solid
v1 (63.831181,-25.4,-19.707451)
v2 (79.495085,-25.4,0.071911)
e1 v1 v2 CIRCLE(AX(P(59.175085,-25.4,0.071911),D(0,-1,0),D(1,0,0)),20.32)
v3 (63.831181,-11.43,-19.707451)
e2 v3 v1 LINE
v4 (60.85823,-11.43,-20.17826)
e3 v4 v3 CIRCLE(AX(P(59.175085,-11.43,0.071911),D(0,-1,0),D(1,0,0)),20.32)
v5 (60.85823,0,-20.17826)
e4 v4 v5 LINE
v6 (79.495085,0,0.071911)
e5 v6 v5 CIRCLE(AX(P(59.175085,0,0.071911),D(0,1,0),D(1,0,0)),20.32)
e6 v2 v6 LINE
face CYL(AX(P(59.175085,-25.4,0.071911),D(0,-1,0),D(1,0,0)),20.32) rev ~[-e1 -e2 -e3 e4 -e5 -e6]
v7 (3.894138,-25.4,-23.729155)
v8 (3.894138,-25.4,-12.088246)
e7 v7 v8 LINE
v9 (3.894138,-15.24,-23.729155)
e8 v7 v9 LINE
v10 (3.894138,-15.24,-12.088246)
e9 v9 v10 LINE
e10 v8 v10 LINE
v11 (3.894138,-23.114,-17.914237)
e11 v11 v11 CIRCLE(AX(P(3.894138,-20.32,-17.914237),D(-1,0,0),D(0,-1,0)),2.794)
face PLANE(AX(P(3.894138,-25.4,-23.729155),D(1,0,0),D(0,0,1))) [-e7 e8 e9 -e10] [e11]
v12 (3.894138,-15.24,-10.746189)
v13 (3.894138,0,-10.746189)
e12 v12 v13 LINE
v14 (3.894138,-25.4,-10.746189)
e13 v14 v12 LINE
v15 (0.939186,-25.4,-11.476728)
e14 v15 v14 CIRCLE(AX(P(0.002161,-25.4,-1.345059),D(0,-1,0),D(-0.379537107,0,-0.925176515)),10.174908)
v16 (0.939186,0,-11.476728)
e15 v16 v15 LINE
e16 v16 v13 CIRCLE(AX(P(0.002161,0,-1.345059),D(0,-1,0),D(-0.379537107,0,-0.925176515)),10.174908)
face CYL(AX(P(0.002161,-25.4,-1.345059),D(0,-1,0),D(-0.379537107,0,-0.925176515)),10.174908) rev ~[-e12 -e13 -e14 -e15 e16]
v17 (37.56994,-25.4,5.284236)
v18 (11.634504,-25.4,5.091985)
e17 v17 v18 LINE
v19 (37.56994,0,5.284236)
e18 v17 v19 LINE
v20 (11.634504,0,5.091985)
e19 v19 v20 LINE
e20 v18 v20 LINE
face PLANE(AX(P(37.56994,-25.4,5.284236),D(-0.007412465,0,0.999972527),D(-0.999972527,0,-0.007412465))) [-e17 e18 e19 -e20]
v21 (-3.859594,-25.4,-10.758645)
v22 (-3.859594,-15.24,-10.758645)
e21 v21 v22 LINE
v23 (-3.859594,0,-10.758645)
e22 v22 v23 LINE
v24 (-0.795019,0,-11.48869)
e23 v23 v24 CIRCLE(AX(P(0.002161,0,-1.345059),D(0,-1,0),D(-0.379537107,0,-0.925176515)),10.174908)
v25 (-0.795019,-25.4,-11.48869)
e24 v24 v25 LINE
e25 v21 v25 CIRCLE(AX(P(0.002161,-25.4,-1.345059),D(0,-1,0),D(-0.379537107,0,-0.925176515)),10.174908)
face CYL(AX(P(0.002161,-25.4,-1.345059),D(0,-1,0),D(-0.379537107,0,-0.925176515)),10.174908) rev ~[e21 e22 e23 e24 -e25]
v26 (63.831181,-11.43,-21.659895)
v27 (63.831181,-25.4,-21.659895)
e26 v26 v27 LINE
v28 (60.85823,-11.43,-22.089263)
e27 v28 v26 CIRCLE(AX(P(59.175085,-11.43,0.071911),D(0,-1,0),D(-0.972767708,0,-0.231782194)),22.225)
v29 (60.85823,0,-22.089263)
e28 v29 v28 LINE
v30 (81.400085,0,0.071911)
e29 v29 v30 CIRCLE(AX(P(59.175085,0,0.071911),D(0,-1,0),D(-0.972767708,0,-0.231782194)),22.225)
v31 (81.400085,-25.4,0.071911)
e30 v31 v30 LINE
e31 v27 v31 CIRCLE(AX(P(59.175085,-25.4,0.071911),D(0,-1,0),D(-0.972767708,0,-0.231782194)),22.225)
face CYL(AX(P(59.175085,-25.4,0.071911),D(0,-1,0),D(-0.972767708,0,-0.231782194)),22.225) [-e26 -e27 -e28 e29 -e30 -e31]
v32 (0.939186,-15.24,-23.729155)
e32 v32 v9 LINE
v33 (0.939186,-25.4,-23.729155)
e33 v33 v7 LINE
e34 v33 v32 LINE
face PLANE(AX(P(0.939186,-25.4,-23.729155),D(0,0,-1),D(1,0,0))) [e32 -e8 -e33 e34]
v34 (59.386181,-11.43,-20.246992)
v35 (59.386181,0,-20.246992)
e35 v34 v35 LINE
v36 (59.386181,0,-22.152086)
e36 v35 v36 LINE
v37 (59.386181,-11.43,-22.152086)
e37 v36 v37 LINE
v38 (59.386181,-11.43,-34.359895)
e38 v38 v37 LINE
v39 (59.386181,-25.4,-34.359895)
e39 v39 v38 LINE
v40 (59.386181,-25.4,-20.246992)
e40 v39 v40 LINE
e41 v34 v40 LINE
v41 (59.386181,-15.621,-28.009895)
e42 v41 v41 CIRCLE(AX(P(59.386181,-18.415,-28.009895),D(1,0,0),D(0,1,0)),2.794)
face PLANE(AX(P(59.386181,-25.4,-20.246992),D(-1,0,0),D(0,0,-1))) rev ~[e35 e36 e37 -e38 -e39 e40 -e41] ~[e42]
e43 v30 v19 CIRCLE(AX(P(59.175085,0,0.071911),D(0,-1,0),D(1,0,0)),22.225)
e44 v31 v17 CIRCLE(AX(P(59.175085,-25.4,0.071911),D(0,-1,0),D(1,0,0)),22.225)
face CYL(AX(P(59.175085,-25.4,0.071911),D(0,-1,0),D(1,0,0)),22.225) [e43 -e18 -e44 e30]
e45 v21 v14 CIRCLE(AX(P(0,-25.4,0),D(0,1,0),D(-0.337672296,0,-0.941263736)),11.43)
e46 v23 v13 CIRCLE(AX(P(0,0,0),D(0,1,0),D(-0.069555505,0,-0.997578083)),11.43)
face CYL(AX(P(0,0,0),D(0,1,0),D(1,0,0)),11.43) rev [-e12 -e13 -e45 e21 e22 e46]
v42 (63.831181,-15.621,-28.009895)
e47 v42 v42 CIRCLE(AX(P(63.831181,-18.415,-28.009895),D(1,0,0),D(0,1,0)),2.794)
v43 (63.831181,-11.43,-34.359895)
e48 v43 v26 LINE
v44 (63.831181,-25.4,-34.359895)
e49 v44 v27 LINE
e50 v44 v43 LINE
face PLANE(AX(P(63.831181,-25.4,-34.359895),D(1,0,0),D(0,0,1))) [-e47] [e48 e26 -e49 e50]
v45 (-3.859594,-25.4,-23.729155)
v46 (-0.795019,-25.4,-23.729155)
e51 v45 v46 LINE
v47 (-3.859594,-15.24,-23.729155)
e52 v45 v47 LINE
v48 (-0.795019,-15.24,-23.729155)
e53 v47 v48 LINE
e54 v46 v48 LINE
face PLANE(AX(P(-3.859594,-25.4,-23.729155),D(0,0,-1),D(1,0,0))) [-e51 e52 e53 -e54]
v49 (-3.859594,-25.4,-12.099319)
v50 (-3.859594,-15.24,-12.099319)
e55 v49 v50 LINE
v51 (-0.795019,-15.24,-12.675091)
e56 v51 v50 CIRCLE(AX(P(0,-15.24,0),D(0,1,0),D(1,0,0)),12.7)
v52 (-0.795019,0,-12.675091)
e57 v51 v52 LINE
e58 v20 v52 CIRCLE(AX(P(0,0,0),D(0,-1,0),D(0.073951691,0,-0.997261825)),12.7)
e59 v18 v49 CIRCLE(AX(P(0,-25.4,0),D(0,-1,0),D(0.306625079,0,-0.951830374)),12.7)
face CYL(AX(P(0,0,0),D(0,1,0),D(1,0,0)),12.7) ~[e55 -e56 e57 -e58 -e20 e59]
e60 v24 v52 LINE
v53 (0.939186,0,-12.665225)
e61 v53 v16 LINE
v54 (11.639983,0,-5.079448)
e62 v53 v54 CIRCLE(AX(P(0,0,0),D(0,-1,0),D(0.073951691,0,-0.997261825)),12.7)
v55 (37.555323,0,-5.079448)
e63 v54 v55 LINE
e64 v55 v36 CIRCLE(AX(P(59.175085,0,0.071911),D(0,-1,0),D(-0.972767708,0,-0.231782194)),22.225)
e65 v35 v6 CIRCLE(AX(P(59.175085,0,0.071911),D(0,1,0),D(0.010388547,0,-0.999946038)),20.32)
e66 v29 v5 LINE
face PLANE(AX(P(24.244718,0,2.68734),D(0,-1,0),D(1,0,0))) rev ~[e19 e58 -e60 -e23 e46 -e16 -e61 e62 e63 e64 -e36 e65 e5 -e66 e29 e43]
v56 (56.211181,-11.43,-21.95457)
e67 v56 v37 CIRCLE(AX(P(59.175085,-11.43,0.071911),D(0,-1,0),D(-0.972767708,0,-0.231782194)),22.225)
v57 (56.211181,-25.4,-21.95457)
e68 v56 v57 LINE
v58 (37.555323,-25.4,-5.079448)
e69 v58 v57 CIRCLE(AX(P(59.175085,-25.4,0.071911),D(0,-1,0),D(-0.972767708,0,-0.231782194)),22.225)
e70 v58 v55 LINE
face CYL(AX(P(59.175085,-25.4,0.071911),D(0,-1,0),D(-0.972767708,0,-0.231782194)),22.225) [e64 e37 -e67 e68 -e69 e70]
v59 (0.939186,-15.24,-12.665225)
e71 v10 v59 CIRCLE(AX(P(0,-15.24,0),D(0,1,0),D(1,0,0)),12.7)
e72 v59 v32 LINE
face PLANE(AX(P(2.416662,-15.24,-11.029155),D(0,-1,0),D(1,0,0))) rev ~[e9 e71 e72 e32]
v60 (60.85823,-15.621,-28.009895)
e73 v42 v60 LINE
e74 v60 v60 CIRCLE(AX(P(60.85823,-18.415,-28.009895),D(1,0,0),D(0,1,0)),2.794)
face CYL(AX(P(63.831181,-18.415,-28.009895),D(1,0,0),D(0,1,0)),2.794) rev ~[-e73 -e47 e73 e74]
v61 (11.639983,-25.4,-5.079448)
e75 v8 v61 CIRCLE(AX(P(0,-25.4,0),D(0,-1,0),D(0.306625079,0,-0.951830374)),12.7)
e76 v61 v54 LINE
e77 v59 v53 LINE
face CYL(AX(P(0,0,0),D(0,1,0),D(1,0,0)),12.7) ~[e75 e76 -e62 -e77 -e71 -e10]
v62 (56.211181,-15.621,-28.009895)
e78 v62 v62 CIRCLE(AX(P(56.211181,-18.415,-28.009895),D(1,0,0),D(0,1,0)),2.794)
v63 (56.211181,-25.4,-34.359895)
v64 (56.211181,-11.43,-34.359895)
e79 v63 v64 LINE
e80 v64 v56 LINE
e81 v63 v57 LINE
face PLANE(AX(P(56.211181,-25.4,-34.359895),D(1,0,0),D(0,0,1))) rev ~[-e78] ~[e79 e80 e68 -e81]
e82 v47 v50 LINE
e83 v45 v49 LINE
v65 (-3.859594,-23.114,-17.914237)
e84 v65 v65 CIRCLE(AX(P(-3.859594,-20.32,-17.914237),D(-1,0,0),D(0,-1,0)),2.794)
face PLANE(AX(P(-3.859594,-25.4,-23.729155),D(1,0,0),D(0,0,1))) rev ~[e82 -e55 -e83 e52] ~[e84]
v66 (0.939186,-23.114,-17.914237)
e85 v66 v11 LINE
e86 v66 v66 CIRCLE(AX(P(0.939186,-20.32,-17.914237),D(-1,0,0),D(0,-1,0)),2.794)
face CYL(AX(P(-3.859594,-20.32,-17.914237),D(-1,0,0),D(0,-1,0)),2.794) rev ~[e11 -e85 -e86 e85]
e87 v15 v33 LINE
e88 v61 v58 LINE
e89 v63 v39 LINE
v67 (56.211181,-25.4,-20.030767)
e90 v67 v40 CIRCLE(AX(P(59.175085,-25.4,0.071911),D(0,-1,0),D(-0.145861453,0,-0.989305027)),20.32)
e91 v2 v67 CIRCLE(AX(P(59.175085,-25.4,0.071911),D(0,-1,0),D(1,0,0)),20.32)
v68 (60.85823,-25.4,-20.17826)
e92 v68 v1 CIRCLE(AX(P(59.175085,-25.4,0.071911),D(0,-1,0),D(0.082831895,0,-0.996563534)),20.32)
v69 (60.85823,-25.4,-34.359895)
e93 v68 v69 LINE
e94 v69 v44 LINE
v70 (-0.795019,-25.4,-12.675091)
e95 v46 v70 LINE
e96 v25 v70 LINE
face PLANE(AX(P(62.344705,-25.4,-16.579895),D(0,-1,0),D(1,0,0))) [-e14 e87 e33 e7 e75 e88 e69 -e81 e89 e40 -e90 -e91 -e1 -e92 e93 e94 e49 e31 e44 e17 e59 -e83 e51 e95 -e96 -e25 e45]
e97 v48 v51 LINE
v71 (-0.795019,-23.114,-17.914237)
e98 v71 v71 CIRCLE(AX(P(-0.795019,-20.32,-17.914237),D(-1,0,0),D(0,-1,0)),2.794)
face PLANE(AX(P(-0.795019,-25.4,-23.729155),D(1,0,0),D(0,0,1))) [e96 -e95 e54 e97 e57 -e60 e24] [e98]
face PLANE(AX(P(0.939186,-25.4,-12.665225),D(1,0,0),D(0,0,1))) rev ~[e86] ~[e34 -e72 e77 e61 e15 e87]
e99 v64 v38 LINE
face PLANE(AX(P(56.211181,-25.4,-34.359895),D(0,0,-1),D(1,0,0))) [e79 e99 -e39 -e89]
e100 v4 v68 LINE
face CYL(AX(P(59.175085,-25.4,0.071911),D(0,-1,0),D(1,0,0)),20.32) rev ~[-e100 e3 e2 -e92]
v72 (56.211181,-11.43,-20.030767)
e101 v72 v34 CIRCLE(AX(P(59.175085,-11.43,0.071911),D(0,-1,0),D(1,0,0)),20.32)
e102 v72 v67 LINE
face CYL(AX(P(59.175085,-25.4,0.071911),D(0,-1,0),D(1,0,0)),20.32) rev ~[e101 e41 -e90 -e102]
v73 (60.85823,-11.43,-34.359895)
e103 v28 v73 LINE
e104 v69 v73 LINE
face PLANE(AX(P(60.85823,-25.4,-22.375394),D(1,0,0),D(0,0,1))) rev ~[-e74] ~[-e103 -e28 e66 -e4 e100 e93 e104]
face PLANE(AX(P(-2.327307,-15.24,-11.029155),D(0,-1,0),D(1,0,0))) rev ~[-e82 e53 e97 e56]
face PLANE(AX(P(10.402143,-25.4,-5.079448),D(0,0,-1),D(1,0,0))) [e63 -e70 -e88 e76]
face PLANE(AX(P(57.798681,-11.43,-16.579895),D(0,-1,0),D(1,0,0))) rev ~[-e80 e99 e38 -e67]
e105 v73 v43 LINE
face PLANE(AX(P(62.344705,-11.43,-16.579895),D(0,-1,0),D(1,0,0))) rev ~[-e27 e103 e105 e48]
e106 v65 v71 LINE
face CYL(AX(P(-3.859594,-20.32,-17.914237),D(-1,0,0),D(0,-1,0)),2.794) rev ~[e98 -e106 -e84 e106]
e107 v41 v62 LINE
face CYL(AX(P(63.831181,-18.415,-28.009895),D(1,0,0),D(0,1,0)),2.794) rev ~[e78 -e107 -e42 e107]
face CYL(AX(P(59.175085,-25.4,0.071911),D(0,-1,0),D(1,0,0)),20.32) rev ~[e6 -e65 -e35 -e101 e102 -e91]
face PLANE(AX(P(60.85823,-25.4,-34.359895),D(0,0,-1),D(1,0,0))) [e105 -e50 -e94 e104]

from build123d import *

# Parameters (mm, degrees)
F0_R      = 12.7
F0_R_2    = 11.43
F1_DEPTH  = 25.4
F3_R      = 20.32
F4_DEPTH  = 25.4
F5_W      = 3.0645749275
F5_H      = 25.4
F6_DEPTH  = 10.16
F8_DEPTH  = 30.226
F9_DEPTH  = 25.4
F10_R     = 2.794
F11_DEPTH = 25.4
F13_W     = 3.175
F13_H     = 35.56
F14_DEPTH = 13.97
F15_R     = 2.794
F16_DEPTH = 25.4
F18_DEPTH = 30.734
F20_DEPTH = 40.64
F22_DEPTH = 25.4


with BuildPart() as f1:
    # F0 (on Front) → F1 (new body)
    with BuildSketch(Plane.XZ):
        Circle(F0_R)
        Circle(F0_R_2, mode=Mode.SUBTRACT)
    extrude(amount=F1_DEPTH)

    # F5 (on offset) → F6 (join)
    with BuildSketch(Plane.XZ.offset(25.4)):
        with Locations((-2.327306883, -11.0291545425)):
            Rectangle(F5_W, F5_H)
        Polygon((3.894138498, 1.6708454575), (0.9391864802, 1.6708454575), (0.9391864802, -23.7291545425), (3.894138498, -23.7291545425), (3.894138498, -11.0291545425), align=None)
    extrude(amount=-F6_DEPTH)

    # F7 (on face) → F8 (cut)
    with BuildSketch(Plane.XZ.offset(25.4)):
        Polygon((-3.8595943467, 6.5400209701), (-3.8595943467, -10.7586445001), (-0.7950194192, -10.7537217399), (0.9391864802, -10.7509360094), (3.894138498, -10.7461893413), (3.894138498, 6.8227690223), align=None)
        Polygon((0.9391864802, -10.7509360094), (-0.7950194192, -10.7537217399), (-0.7950194192, -12.6750914838), (0.9391864802, -12.6652251759), (0.9391864802, -11.3913488558), align=None)
    extrude(amount=-F8_DEPTH, mode=Mode.SUBTRACT)

    # F7 (on face) → F9 (cut)
    with BuildSketch(Plane.XZ.offset(25.4)):
        Polygon((-3.8595943467, 6.5400209701), (-3.8595943467, -10.7586445001), (-0.7950194192, -10.7537217399), (0.9391864802, -10.7509360094), (3.894138498, -10.7461893413), (3.894138498, 6.8227690223), align=None)
        Polygon((0.9391864802, -10.7509360094), (-0.7950194192, -10.7537217399), (-0.7950194192, -12.6750914838), (0.9391864802, -12.6652251759), (0.9391864802, -11.3913488558), align=None)
    extrude(amount=-F9_DEPTH, mode=Mode.SUBTRACT)

    # F10 (on face) → F11 (cut)
    with BuildSketch(Plane(origin=(-3.8595943467, 0, 0), x_dir=(0, -1, 0), z_dir=(-1, 0, 0))):
        with Locations((20.32, -17.914237003)):
            Circle(F10_R)
    extrude(amount=-F11_DEPTH, mode=Mode.SUBTRACT)


with BuildPart() as f4:
    # F3 (on offset) → F4 (new body)
    with BuildSketch(Plane.XZ.offset(25.4)):
        with BuildLine():
            Line((37.5699403561, 5.2842361421), (10.6034887032, 5.0843427817))
            ThreePointArc((10.6034887032, 5.0843427817), (11.5328465432, 2.6263680661), (11.8205691299, 0.0143647333))
            Line((11.8205691299, 0.0143647333), (36.950101903, 0.0449029444))
            ThreePointArc((36.950101903, 0.0449029444), (37.1040026209, 2.6830272873), (37.5699403561, 5.2842361421))
        make_face()
        with BuildLine():
            ThreePointArc((81.4000854922, 0.0719114545), (61.799611578, 22.1414036966), (37.5699403561, 5.2842361421))
            Line((37.5699403561, 5.2842361421), (38.7200076161, 5.2927612092))
            ThreePointArc((38.7200076161, 5.2927612092), (37.3247254516, 0.1119146147), (38.6803581082, -5.079447813))
            Line((38.6803581082, -5.079447813), (37.5553231739, -5.079447813))
            ThreePointArc((37.5553231739, -5.079447813), (61.7684816706, -22.0012605256), (81.4000854922, 0.0719114545))
        make_face()
        with Locations((59.1750854922, 0.0719114545)):
            Circle(F3_R, mode=Mode.SUBTRACT)
        with BuildLine():
            Line((38.7200076161, 5.2927612092), (37.5699403561, 5.2842361421))
            ThreePointArc((37.5699403561, 5.2842361421), (37.1040026209, 2.6830272873), (36.950101903, 0.0449029444))
            ThreePointArc((36.950101903, 0.0449029444), (37.1034933748, -2.5348962497), (37.5553231739, -5.079447813))
            Line((37.5553231739, -5.079447813), (38.6803581082, -5.079447813))
            ThreePointArc((38.6803581082, -5.079447813), (37.3247254516, 0.1119146147), (38.7200076161, 5.2927612092))
        make_face()
        with BuildLine():
            Line((36.950101903, 0.0449029444), (11.8205691299, 0.0143647333))
            ThreePointArc((11.8205691299, 0.0143647333), (11.4383828548, -2.6236056978), (10.4021426077, -5.079447813))
            Line((10.4021426077, -5.079447813), (37.5553231739, -5.079447813))
            ThreePointArc((37.5553231739, -5.079447813), (37.1034933748, -2.5348962497), (36.950101903, 0.0449029444))
        make_face()
    extrude(amount=-F4_DEPTH)


with BuildPart() as f1_1:
    add(f1.part)

    # F12: union F4
    add(f4.part)

    # F13 (on face) → F14 (join)
    with BuildSketch(Plane.XZ.offset(25.4)):
        Polygon((63.8311807601, 1.2001052282), (60.8582296082, 1.2001052282), (60.8582296082, -34.3598947718), (63.8311807601, -34.3598947718), (63.8311807601, -21.6598947718), align=None)
        with Locations((57.7986807601, -16.5798947718)):
            Rectangle(F13_W, F13_H)
    extrude(amount=-F14_DEPTH)

    # F15 (on face) → F16 (cut)
    with BuildSketch(Plane.YZ.offset(63.8311807601)):
        with Locations((-18.415, -28.0098947718)):
            Circle(F15_R)
    extrude(amount=-F16_DEPTH, mode=Mode.SUBTRACT)

    # F17 (on face) → F18 (cut)
    with BuildSketch(Plane.XZ.offset(25.4)):
        with BuildLine():
            ThreePointArc((63.8311807601, -19.7074509431), (58.3136851955, 20.3736451127), (56.2111807601, -20.0307666939))
            Line((56.2111807601, -20.0307666939), (56.2111807601, 1.2001052282))
            Line((56.2111807601, 1.2001052282), (59.3861807601, 1.2001052282))
            Line((59.3861807601, 1.2001052282), (60.8582296082, 1.2001052282))
            Line((60.8582296082, 1.2001052282), (63.8311807601, 1.2001052282))
            Line((63.8311807601, 1.2001052282), (63.8311807601, -19.7074509431))
        make_face()
        with BuildLine():
            Line((56.2111807601, 1.2001052282), (56.2111807601, -20.0307666939))
            ThreePointArc((56.2111807601, -20.0307666939), (57.7944413181, -20.2011302922), (59.3861807601, -20.2469920294))
            Line((59.3861807601, -20.2469920294), (59.3861807601, 1.2001052282))
            Line((59.3861807601, 1.2001052282), (56.2111807601, 1.2001052282))
        make_face()
        with BuildLine():
            ThreePointArc((60.8582296082, -20.1782595543), (62.3534347774, -19.9979788248), (63.8311807601, -19.7074509431))
            Line((63.8311807601, -19.7074509431), (63.8311807601, 1.2001052282))
            Line((63.8311807601, 1.2001052282), (60.8582296082, 1.2001052282))
            Line((60.8582296082, 1.2001052282), (60.8582296082, -20.1782595543))
        make_face()
        with BuildLine():
            ThreePointArc((60.8582296082, -20.1782595543), (60.1228284685, -20.2259747224), (59.3861807601, -20.2469920294))
            Line((59.3861807601, -20.2469920294), (59.3861807601, -22.1520860209))
            Line((59.3861807601, -22.1520860209), (60.8582296082, -22.0892629477))
            Line((60.8582296082, -22.0892629477), (60.8582296082, -20.1782595543))
        make_face()
        with BuildLine():
            Line((59.3861807601, 1.2001052282), (59.3861807601, -20.2469920294))
            ThreePointArc((59.3861807601, -20.2469920294), (60.1228284685, -20.2259747224), (60.8582296082, -20.1782595543))
            Line((60.8582296082, -20.1782595543), (60.8582296082, 1.2001052282))
            Line((60.8582296082, 1.2001052282), (59.3861807601, 1.2001052282))
        make_face()
        Polygon((60.8582296082, -22.0892629477), (59.3861807601, -22.1520860209), (59.3861807601, -22.3753936589), (60.8582296082, -22.3753936589), align=None)
    extrude(amount=-F18_DEPTH, mode=Mode.SUBTRACT)

    # F19 (on face) → F20 (cut)
    with BuildSketch(Plane.XZ.offset(25.4)):
        with BuildLine():
            Line((-3.8612207101, -9.7461815458), (-3.8595943467, -10.7586445001))
            ThreePointArc((-3.8595943467, -10.7586445001), (0.0185050029, -11.5199534125), (3.894138498, -10.7461893413))
            Line((3.894138498, -10.7461893413), (3.894138498, -9.7337237745))
            Line((3.894138498, -9.7337237745), (-3.8612207101, -9.7461815458))
        make_face()
    extrude(amount=-F20_DEPTH, mode=Mode.SUBTRACT)

    # F21 (on face) → F22 (cut)
    with BuildSketch(Plane.XZ.offset(25.4)):
        Polygon((0.9391864802, -11.4767284574), (-0.7950194192, -11.4886898794), (-0.7950194192, -13.0471941084), (0.9391864802, -13.0471941084), align=None)
    extrude(amount=-F22_DEPTH, mode=Mode.SUBTRACT)


solid = f1_1.part
